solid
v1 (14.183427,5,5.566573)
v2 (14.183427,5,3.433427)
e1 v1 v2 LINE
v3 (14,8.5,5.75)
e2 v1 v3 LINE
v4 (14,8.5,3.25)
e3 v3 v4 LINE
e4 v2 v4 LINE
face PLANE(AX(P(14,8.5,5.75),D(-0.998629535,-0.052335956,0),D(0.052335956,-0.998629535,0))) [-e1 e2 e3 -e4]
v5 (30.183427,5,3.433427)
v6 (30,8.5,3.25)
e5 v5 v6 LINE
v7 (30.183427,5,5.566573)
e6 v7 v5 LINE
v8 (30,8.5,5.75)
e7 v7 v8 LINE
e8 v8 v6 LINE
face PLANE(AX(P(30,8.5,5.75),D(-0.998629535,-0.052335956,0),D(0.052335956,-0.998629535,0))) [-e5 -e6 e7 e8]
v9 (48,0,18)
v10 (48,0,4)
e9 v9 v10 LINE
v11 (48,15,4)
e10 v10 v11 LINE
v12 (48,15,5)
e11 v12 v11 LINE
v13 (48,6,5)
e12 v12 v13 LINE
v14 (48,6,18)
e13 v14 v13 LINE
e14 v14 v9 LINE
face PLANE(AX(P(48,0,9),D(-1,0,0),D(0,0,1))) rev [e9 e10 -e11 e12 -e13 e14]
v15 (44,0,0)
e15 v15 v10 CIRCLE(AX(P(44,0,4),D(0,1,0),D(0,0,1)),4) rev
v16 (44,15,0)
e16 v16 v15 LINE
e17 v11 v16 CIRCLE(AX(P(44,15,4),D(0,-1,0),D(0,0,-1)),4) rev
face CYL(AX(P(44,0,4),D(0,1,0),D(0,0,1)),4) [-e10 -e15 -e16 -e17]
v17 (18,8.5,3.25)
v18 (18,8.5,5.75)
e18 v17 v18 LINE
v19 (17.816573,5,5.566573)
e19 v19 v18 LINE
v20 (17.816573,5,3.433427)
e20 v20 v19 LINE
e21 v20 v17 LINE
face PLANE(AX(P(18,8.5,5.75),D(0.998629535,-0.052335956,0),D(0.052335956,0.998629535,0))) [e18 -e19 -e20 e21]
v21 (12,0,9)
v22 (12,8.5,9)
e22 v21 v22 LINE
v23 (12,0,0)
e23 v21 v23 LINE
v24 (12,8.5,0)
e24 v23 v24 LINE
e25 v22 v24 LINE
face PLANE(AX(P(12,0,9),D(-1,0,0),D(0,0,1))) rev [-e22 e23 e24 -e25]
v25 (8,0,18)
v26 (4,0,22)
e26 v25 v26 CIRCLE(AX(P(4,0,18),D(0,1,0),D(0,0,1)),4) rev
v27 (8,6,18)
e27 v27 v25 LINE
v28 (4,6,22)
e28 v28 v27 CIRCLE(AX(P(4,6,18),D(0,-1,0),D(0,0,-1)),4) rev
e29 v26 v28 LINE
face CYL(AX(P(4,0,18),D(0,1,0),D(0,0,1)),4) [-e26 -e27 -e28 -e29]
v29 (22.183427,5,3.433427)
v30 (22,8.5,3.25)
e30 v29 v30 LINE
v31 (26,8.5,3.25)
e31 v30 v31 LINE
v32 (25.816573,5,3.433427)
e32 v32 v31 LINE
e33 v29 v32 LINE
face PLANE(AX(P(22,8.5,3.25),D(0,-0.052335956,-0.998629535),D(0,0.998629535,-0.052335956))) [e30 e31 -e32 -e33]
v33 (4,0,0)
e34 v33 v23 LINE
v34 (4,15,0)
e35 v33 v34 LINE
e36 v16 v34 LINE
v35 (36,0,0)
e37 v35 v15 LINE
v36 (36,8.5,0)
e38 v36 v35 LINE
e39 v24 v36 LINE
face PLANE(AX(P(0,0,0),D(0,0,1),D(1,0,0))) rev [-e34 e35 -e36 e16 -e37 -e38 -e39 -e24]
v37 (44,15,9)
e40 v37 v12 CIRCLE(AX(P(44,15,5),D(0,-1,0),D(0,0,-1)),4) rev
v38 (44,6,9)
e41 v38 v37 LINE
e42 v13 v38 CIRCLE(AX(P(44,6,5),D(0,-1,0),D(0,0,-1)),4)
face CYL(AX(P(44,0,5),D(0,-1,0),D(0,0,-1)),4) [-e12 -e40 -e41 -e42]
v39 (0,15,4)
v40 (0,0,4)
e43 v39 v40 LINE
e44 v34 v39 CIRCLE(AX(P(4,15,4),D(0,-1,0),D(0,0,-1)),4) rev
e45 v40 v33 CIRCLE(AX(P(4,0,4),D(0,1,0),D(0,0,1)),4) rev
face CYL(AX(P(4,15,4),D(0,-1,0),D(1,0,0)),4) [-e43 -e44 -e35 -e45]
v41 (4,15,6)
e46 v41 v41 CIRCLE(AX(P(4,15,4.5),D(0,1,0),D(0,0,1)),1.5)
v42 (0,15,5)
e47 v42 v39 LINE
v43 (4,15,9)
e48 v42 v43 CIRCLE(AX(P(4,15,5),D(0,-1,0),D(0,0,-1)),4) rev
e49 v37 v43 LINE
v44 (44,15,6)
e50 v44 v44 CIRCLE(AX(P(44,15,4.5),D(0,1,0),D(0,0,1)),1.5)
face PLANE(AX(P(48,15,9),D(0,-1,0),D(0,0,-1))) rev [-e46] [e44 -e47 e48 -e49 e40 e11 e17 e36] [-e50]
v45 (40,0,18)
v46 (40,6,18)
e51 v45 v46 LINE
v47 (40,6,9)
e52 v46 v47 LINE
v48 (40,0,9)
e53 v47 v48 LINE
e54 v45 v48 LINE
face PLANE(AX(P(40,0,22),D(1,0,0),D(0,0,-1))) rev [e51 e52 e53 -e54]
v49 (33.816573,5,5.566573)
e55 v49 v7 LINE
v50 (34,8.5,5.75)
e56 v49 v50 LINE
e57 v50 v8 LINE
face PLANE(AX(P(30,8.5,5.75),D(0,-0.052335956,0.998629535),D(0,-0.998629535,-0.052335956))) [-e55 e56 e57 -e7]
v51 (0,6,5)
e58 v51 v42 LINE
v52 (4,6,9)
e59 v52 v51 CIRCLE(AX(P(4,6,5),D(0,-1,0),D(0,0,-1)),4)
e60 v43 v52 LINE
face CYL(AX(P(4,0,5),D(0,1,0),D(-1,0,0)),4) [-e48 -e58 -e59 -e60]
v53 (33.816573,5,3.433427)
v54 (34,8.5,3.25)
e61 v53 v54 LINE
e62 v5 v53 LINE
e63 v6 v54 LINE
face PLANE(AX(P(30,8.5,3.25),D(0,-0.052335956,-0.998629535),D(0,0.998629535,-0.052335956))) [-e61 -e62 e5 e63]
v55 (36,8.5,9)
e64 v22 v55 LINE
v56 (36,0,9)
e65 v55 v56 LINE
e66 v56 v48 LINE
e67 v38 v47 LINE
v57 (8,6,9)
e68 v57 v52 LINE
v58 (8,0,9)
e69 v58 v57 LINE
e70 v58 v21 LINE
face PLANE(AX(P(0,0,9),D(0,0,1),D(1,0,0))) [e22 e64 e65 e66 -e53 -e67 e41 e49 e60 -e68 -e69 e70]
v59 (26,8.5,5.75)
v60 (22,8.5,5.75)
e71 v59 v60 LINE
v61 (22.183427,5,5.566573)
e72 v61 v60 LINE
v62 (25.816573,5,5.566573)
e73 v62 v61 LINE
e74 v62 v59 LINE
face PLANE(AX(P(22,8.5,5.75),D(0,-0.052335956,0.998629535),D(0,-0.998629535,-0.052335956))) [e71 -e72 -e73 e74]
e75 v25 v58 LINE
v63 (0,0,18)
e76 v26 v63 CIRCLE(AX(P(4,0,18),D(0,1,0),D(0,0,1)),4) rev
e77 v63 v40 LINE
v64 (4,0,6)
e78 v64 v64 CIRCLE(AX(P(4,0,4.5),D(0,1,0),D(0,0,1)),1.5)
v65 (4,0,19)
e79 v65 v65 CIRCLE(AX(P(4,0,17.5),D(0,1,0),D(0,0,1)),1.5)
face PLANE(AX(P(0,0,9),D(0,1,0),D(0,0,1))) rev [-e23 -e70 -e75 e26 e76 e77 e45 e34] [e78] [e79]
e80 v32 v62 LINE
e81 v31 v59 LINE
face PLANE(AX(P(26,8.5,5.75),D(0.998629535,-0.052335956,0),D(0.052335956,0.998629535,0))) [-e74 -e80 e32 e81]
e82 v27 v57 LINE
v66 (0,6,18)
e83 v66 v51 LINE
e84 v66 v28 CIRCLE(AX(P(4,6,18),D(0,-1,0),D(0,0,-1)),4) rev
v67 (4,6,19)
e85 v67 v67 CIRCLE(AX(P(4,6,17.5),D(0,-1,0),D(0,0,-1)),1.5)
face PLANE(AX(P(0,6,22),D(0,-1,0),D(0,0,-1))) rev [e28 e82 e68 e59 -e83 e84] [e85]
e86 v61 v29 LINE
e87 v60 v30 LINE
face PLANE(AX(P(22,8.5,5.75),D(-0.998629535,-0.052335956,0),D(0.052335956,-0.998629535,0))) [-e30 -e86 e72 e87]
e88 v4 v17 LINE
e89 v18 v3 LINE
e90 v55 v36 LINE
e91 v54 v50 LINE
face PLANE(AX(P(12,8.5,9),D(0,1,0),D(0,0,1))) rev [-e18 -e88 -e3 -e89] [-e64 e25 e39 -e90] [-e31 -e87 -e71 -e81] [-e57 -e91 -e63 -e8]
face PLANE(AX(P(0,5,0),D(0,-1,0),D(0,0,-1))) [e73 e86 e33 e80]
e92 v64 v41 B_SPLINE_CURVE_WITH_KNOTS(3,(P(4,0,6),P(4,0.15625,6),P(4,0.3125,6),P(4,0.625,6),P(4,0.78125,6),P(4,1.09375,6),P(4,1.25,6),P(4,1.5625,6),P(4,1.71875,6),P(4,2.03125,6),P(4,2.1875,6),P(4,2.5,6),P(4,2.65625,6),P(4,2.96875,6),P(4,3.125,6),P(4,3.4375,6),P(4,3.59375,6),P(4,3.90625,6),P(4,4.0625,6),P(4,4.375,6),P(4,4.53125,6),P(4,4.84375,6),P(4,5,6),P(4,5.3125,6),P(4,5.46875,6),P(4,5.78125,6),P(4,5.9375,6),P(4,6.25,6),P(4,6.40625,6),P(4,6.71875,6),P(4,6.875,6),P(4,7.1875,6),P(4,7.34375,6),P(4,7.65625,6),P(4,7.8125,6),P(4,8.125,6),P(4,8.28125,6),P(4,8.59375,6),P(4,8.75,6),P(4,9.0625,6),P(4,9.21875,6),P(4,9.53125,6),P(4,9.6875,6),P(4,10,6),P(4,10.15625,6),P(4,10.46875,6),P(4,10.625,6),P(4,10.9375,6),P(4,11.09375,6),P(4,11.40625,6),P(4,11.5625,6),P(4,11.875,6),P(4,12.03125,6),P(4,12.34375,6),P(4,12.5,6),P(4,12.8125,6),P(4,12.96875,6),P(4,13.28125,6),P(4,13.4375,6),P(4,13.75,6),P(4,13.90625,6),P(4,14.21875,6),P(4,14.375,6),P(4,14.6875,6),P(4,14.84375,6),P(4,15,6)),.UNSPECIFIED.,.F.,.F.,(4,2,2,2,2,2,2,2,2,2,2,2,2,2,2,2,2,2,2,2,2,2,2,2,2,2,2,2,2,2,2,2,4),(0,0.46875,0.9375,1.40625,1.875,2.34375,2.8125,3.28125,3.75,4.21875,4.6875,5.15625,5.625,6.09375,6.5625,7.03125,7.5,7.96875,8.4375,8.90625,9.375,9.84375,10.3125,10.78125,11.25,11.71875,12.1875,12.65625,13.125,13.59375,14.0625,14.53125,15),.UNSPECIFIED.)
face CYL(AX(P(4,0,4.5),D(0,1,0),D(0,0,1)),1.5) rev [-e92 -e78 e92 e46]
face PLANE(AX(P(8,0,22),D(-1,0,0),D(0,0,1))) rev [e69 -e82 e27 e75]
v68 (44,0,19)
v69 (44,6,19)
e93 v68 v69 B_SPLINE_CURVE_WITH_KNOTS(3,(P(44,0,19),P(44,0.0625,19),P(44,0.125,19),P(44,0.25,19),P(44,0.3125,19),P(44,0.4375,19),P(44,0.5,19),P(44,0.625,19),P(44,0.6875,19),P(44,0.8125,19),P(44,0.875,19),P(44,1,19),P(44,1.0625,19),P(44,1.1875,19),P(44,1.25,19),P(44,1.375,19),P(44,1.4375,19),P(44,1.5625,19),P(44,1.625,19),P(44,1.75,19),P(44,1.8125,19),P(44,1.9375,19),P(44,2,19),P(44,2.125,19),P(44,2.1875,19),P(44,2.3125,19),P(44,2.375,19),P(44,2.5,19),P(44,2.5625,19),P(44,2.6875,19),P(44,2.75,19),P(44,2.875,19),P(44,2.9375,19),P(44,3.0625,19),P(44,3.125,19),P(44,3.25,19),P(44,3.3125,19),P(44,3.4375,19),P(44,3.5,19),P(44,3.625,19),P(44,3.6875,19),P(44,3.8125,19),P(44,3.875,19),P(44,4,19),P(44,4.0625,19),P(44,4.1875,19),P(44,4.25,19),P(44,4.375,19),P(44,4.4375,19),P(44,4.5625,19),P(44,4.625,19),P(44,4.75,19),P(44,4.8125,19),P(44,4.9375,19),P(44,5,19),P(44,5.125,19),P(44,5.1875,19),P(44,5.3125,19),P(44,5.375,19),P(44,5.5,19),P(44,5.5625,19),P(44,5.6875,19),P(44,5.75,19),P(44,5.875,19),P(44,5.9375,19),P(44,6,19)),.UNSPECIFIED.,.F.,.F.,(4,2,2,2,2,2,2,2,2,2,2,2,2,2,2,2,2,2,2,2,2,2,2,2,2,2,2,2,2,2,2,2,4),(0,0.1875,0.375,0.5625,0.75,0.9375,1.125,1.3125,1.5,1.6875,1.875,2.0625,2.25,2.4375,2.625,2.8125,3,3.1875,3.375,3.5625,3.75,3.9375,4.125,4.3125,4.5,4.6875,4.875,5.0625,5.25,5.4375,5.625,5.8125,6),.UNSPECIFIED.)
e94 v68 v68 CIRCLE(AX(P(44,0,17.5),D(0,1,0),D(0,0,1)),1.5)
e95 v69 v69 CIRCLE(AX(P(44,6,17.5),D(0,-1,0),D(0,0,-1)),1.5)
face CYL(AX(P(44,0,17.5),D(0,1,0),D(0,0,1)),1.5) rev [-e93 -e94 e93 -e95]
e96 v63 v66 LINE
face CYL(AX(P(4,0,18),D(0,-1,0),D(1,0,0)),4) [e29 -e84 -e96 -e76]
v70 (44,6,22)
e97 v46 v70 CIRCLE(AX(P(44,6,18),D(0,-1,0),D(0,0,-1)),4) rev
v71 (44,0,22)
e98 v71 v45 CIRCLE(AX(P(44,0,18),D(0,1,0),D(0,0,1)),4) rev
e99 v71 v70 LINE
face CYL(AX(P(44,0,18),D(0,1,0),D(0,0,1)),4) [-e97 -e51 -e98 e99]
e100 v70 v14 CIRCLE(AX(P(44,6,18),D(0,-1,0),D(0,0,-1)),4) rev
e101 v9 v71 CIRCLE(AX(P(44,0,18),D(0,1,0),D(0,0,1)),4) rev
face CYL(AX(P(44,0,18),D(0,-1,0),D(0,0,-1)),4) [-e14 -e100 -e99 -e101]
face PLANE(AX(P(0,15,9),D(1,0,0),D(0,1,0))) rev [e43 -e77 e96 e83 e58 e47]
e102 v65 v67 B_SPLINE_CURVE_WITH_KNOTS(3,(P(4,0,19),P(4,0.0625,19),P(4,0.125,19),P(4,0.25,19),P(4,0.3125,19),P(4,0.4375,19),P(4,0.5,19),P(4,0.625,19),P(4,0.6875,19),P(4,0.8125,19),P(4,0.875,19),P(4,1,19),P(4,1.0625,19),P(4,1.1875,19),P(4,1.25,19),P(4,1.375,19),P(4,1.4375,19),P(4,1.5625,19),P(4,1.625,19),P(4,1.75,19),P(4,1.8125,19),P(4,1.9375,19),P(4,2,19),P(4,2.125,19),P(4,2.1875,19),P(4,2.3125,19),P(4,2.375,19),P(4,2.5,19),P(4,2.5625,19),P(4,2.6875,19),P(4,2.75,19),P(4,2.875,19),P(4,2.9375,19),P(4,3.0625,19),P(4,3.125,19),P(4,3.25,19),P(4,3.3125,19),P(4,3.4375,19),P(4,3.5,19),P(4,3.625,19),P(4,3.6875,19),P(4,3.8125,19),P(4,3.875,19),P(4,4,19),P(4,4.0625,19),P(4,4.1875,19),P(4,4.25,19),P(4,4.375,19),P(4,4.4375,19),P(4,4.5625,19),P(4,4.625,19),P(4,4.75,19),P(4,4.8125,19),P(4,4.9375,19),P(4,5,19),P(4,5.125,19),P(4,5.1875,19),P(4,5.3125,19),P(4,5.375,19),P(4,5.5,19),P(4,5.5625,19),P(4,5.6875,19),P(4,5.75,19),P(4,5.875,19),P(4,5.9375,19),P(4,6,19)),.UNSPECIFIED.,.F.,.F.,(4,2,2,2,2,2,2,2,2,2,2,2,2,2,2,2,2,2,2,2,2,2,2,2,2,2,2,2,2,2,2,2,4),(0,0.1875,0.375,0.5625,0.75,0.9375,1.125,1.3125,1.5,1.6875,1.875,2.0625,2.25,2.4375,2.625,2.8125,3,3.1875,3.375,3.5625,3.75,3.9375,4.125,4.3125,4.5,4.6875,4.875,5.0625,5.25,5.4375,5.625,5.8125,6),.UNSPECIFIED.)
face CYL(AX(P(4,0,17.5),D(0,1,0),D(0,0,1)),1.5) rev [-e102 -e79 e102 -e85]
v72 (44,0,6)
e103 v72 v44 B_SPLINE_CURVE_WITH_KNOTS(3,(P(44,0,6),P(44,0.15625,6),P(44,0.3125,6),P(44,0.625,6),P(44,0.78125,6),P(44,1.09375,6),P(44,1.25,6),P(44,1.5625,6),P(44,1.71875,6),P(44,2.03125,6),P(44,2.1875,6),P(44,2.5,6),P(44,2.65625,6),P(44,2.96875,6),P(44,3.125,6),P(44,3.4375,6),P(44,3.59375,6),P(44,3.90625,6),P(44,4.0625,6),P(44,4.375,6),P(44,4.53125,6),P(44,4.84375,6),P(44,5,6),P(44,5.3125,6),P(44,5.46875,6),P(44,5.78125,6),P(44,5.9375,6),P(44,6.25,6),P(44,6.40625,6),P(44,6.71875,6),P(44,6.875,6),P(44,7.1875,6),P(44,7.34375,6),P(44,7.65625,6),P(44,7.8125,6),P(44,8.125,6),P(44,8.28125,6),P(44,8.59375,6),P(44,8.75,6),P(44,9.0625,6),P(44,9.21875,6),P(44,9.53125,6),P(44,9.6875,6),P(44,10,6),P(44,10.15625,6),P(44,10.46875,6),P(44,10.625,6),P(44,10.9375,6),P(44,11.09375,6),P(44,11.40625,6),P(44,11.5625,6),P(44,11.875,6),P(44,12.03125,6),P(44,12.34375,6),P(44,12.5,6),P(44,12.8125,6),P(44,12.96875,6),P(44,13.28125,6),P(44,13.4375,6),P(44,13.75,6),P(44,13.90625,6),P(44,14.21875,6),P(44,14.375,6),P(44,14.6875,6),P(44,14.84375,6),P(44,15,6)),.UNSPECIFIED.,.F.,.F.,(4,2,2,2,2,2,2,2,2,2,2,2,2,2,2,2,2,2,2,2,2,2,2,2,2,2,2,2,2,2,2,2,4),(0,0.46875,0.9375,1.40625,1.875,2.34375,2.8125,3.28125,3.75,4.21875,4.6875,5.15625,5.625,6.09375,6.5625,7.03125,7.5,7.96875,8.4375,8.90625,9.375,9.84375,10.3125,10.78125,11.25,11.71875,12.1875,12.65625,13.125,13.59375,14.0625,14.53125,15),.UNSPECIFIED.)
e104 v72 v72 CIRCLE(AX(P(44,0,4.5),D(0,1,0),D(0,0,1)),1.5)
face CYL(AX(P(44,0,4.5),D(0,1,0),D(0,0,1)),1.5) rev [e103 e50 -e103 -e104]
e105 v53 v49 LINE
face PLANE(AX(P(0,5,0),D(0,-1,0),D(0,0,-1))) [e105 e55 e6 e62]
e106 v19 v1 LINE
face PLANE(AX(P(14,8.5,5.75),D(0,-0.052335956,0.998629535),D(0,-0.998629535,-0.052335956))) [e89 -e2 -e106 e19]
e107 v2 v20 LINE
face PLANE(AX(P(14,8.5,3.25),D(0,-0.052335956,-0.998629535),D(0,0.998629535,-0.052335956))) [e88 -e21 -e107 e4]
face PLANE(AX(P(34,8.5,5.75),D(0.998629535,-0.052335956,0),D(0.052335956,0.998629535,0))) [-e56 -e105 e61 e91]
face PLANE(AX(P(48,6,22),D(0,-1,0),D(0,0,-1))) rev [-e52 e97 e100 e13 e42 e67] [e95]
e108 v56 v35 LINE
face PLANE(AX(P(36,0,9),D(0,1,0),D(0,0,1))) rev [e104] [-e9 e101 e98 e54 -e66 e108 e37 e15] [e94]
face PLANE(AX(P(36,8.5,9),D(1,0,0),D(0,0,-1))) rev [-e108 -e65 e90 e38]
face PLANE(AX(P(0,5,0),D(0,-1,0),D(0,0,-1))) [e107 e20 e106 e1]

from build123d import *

# Parameters (mm, degrees)
BOSS_EXTRUDE1_DEPTH           = 9
SKETCH2_W                     = 4
SKETCH2_H                     = 2.5
BOSS_EXTRUDE2_DEPTH           = 3.5
BOSS_EXTRUDE2_DRAFT           = 3
BOSS_EXTRUDE2_PROFILE_2_DEPTH = 3.5
BOSS_EXTRUDE2_PROFILE_2_DRAFT = 3
BOSS_EXTRUDE2_PROFILE_3_DEPTH = 3.5
BOSS_EXTRUDE2_PROFILE_3_DRAFT = 3
SKETCH4_W                     = 8
SKETCH4_H                     = 6
BOSS_EXTRUDE4_DEPTH           = 13
SKETCH3_R                     = 1.5
CUT_EXTRUDE1_DEPTH            = 55.890800686
FILLET1_R                     = 4


with BuildPart() as part:
    # Sketch1 → Boss-Extrude1 (new body)
    with BuildSketch(Plane.XY):
        Polygon((0, 0), (12, 0), (12, 8.5), (36, 8.5), (36, 0), (48, 0), (48, 15), (0, 15), align=None)
    extrude(amount=BOSS_EXTRUDE1_DEPTH)


with BuildPart() as boss_extrude2_tool:
    # Sketch2 → Boss-Extrude2 (with draft: the straight prism first)
    with BuildSketch(Plane(origin=(0, 8.5, 0), x_dir=(-1, 0, 0), z_dir=(0, -1, 0))):
        with Locations((-16, -4.5)):
            Rectangle(SKETCH2_W, SKETCH2_H)
    extrude(amount=BOSS_EXTRUDE2_DEPTH)
    # Boss-Extrude2: the draft: its side faces are tilted about the plane it starts from
    boss_extrude2_sides = [boss_extrude2_tool.faces().sort_by_distance(p)[0] for p in [
        (14, 6.75, 4.5),
        (16, 6.75, 3.25),
        (18, 6.75, 4.5),
        (16, 6.75, 5.75),
    ]]
    draft(boss_extrude2_sides, Plane(origin=(0, 8.5, 0), x_dir=(-1, 0, 0), z_dir=(0, -1, 0)), BOSS_EXTRUDE2_DRAFT)


with BuildPart() as part_1:
    add(part.part)

    # Boss-Extrude2: add boss_extrude2_tool
    add(boss_extrude2_tool.part)


with BuildPart() as boss_extrude2_profile_2_tool:
    # Sketch2 → Boss-Extrude2 profile 2 (with draft: the straight prism first)
    with BuildSketch(Plane(origin=(0, 8.5, 0), x_dir=(-1, 0, 0), z_dir=(0, -1, 0))):
        with Locations((-24, -4.5)):
            Rectangle(SKETCH2_W, SKETCH2_H)
    extrude(amount=BOSS_EXTRUDE2_PROFILE_2_DEPTH)
    # Boss-Extrude2 profile 2: the draft: its side faces are tilted about the plane it starts from
    boss_extrude2_profile_2_sides = [boss_extrude2_profile_2_tool.faces().sort_by_distance(p)[0] for p in [
        (22, 6.75, 4.5),
        (24, 6.75, 3.25),
        (26, 6.75, 4.5),
        (24, 6.75, 5.75),
    ]]
    draft(boss_extrude2_profile_2_sides, Plane(origin=(0, 8.5, 0), x_dir=(-1, 0, 0), z_dir=(0, -1, 0)), BOSS_EXTRUDE2_PROFILE_2_DRAFT)


with BuildPart() as part_2:
    add(part_1.part)

    # Boss-Extrude2 profile 2: add boss_extrude2_profile_2_tool
    add(boss_extrude2_profile_2_tool.part)


with BuildPart() as boss_extrude2_profile_3_tool:
    # Sketch2 → Boss-Extrude2 profile 3 (with draft: the straight prism first)
    with BuildSketch(Plane(origin=(0, 8.5, 0), x_dir=(-1, 0, 0), z_dir=(0, -1, 0))):
        with Locations((-32, -4.5)):
            Rectangle(SKETCH2_W, SKETCH2_H)
    extrude(amount=BOSS_EXTRUDE2_PROFILE_3_DEPTH)
    # Boss-Extrude2 profile 3: the draft: its side faces are tilted about the plane it starts from
    boss_extrude2_profile_3_sides = [boss_extrude2_profile_3_tool.faces().sort_by_distance(p)[0] for p in [
        (30, 6.75, 4.5),
        (32, 6.75, 3.25),
        (34, 6.75, 4.5),
        (32, 6.75, 5.75),
    ]]
    draft(boss_extrude2_profile_3_sides, Plane(origin=(0, 8.5, 0), x_dir=(-1, 0, 0), z_dir=(0, -1, 0)), BOSS_EXTRUDE2_PROFILE_3_DRAFT)


with BuildPart() as part_3:
    add(part_2.part)

    # Boss-Extrude2 profile 3: add boss_extrude2_profile_3_tool
    add(boss_extrude2_profile_3_tool.part)

    # Sketch4 → Boss-Extrude4 (add)
    with BuildSketch(Plane.XY.offset(9)):
        with Locations((4, 3)):
            Rectangle(SKETCH4_W, SKETCH4_H)
        with Locations((44, 3)):
            Rectangle(SKETCH4_W, SKETCH4_H)
    extrude(amount=BOSS_EXTRUDE4_DEPTH)

    # Sketch3 → Cut-Extrude1 (cut, through all)
    with BuildSketch(Plane(origin=(0, 15, 0), x_dir=(1, 0, 0), z_dir=(0, 1, 0))):
        with Locations(Location((4, -4.5, 0), (0, 0, 270))):
            Circle(SKETCH3_R)
        with Locations(Location((44, -4.5, 0), (0, 0, 270))):
            Circle(SKETCH3_R)
        with Locations(Location((4, -17.5, 0), (0, 0, 270))):
            Circle(SKETCH3_R)
        with Locations(Location((44, -17.5, 0), (0, 0, 270))):
            Circle(SKETCH3_R)
    extrude(amount=-CUT_EXTRUDE1_DEPTH, mode=Mode.SUBTRACT)

    # Fillet1
    fillet1_edges = [part_3.edges().sort_by_distance(p)[0] for p in [
        (40, 3, 22),
        (48, 3, 22),
        (48, 7.5, 0),
        (48, 10.5, 9),
        (0, 3, 22),
        (8, 3, 22),
        (0, 7.5, 0),
        (0, 10.5, 9),
    ]]
    fillet(fillet1_edges, radius=FILLET1_R - 0.0001)  # a hair under: the kernel refuses the full size


solid = part_3.part
